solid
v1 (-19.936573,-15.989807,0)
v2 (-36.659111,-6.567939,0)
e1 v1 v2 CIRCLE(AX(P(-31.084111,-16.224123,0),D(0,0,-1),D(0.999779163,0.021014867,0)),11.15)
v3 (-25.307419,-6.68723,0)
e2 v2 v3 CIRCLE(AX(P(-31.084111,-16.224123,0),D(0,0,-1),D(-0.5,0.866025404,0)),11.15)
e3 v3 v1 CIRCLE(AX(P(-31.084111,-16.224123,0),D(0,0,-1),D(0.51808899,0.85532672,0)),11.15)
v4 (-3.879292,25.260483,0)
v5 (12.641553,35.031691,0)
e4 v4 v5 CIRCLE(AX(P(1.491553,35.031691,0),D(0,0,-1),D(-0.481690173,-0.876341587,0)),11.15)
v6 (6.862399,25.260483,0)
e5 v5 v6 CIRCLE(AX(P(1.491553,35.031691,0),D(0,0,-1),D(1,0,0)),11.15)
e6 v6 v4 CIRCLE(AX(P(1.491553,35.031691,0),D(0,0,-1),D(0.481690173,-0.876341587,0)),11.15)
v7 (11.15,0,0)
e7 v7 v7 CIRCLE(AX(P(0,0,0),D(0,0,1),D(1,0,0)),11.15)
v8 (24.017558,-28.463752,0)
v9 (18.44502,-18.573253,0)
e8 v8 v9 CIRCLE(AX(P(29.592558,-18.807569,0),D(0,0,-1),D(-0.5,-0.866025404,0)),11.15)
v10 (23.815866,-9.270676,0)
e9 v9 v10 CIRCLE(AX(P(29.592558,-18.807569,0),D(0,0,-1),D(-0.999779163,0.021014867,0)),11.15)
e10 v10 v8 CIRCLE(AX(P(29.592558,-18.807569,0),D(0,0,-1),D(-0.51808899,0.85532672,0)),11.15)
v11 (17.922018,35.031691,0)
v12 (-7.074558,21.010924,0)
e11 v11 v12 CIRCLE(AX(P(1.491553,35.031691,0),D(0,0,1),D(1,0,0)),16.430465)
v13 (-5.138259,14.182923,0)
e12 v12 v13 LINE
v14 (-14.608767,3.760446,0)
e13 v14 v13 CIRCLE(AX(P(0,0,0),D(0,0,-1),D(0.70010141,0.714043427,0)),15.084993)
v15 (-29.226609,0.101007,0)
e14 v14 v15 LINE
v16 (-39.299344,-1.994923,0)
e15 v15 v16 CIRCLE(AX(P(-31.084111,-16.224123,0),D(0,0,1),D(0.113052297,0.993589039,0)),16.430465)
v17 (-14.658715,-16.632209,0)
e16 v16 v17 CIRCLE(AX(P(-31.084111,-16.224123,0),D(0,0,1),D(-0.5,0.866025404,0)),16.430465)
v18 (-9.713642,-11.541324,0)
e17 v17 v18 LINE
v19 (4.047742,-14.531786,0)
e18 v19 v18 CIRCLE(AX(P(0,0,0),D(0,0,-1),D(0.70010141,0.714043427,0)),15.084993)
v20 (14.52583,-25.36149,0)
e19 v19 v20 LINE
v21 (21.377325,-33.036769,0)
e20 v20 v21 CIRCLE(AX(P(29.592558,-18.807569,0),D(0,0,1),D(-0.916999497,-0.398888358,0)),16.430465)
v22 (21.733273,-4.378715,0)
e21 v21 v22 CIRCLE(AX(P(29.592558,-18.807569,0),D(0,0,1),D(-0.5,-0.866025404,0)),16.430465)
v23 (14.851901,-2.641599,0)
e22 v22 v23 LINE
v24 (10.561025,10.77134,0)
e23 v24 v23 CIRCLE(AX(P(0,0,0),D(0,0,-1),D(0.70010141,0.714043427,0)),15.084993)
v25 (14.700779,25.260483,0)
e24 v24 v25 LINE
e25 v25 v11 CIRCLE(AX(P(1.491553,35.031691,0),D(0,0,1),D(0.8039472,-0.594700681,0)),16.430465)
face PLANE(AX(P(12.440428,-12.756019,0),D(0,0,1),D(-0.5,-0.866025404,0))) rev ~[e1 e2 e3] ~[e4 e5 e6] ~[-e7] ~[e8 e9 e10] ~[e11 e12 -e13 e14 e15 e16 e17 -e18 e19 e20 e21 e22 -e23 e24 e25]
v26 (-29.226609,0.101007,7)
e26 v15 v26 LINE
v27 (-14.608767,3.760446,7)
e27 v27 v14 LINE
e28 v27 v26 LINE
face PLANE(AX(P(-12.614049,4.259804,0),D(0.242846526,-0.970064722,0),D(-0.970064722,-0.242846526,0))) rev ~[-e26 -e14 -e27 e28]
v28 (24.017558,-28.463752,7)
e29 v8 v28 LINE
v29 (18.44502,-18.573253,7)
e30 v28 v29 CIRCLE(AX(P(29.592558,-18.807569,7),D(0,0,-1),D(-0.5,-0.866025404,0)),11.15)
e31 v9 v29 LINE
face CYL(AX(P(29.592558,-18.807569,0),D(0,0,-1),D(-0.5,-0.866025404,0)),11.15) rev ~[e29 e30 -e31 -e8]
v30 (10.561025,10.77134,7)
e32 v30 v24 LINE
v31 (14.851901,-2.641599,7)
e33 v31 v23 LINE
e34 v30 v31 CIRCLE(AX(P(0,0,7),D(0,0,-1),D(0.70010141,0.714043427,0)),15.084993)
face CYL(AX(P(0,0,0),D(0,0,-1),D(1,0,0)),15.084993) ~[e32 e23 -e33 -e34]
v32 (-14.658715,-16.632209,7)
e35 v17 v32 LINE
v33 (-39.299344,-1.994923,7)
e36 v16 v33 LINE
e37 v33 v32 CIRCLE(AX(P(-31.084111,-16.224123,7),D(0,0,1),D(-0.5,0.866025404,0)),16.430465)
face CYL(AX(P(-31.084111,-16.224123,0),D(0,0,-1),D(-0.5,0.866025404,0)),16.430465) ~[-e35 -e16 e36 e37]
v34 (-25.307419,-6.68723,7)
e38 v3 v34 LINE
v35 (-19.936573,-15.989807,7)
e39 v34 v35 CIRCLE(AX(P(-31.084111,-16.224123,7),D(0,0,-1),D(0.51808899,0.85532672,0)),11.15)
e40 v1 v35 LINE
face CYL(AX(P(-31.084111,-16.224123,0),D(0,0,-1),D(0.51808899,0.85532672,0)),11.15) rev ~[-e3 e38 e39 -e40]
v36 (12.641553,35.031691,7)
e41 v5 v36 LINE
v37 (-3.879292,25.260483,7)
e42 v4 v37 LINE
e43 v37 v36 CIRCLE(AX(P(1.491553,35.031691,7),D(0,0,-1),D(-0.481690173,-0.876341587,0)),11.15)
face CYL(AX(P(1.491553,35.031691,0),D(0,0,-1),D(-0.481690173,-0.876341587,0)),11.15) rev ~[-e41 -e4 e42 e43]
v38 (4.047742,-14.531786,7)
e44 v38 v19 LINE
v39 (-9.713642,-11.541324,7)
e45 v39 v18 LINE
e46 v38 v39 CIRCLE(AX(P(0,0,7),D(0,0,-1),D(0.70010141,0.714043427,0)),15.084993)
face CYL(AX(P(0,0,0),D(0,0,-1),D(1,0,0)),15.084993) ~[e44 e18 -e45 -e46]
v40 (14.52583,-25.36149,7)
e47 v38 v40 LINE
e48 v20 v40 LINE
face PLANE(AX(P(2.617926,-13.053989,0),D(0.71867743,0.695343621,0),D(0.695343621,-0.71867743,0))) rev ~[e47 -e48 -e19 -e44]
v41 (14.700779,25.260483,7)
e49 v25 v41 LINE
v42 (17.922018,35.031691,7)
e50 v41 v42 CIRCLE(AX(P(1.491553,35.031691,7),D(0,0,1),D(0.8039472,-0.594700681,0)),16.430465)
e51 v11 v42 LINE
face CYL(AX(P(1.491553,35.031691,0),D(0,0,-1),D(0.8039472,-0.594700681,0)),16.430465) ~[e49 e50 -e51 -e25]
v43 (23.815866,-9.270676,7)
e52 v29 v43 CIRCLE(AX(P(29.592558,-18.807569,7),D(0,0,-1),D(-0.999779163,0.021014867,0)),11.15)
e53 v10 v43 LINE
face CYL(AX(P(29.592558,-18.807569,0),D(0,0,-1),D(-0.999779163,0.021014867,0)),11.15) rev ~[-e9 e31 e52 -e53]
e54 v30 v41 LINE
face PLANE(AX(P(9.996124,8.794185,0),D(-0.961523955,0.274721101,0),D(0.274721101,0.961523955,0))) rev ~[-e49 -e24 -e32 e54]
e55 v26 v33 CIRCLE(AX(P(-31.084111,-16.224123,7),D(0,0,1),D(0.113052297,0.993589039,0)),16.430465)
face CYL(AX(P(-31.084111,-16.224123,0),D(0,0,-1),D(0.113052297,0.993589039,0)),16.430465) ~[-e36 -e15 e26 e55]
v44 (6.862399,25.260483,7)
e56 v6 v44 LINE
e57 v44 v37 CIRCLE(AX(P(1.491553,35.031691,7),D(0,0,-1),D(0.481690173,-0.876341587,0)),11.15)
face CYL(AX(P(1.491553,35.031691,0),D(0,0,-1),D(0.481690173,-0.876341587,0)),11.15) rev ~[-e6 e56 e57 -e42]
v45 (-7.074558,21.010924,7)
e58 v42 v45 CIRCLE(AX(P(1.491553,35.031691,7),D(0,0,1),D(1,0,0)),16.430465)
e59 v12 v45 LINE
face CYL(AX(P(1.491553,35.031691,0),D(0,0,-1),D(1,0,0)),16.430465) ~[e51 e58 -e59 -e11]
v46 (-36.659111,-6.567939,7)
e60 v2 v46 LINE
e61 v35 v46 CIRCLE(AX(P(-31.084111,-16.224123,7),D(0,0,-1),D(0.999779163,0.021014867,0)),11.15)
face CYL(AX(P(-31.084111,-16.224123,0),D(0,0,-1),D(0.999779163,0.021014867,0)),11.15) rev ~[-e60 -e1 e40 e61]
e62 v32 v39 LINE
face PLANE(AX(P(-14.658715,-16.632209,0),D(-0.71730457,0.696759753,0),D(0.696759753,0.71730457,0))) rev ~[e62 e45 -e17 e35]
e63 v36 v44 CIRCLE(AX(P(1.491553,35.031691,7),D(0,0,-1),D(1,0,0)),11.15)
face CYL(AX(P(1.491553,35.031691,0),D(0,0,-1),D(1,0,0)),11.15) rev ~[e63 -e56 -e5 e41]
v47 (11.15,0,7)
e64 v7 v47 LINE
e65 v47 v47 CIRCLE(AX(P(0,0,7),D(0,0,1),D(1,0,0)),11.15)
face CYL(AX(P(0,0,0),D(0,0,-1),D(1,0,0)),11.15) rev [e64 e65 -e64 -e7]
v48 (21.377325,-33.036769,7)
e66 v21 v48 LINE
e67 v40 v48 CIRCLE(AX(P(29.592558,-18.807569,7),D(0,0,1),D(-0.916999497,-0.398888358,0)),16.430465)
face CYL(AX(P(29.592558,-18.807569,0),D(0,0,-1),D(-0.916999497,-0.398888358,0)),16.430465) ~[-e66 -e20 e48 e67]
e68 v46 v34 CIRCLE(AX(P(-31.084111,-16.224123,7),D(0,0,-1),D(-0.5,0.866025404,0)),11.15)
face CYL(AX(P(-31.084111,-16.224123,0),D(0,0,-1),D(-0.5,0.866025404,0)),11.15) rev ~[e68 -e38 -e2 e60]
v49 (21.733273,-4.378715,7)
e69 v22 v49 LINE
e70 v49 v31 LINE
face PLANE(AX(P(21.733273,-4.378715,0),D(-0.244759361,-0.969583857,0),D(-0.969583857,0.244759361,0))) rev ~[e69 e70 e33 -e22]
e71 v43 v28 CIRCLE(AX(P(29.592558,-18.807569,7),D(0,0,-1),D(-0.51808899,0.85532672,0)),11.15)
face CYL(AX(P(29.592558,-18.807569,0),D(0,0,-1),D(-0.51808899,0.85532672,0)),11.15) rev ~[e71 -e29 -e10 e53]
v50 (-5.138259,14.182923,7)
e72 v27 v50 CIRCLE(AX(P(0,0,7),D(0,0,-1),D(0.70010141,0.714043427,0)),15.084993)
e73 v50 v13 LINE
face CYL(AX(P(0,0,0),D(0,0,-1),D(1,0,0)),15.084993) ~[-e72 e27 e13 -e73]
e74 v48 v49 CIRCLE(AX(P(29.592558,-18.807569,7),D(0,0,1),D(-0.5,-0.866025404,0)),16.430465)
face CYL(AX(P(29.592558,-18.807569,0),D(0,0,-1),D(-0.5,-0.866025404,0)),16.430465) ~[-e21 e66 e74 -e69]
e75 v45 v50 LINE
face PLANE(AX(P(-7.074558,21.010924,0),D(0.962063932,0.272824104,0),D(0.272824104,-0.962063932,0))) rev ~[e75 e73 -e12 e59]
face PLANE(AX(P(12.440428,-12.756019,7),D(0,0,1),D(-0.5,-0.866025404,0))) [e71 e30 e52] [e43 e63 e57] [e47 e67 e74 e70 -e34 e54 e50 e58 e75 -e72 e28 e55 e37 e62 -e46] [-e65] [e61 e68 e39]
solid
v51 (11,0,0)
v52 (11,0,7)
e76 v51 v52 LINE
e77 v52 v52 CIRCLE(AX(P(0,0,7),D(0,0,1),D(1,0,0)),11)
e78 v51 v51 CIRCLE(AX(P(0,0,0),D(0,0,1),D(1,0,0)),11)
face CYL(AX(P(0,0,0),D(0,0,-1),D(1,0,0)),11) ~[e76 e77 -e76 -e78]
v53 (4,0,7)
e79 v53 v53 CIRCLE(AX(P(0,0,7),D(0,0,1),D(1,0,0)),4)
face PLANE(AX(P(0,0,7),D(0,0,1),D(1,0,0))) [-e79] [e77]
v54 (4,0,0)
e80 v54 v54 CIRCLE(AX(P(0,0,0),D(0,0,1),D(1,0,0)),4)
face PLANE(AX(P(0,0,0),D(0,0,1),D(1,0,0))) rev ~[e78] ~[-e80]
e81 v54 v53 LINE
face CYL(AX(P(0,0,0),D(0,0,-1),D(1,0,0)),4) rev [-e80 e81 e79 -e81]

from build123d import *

# Parameters (mm, degrees)
F0_R            = 11
F0_R_2          = 4
F1_DEPTH        = 7
F2_R            = 15.0849931144
F2_R_2          = 11.15
F3_DEPTH        = 7
F5_DEPTH        = 7
F5_COPIES_COUNT = 3


# Not quite as in the source:
# - a pattern or mirror of a feature is missing from the dataset's text; its kind, count and spacing are read off the source's solid


with BuildPart() as f1:
    # F0 (on Top) → F1 (new body)
    with BuildSketch(Plane.XY):
        Circle(F0_R)
        Circle(F0_R_2, mode=Mode.SUBTRACT)
    extrude(amount=F1_DEPTH)


with BuildPart() as f3:
    # F2 (on Top) → F3 (new body)
    with BuildSketch(Plane.XY):
        Circle(F2_R)
        Circle(F2_R_2, mode=Mode.SUBTRACT)
    extrude(amount=F3_DEPTH)

    # F4 (on Top) → F5 (join)
    with BuildSketch(Plane.XY):
        with BuildLine():
            Line((-7.0745577316, 21.0109236638), (-4.8416383778, 13.1369449955))
            Line((-4.8416383778, 13.1369449955), (6.196208957, 12.7750489976))
            Line((6.196208957, 12.7750489976), (9.9961235482, 8.7941850849))
            Line((9.9961235482, 8.7941850849), (14.7007794568, 25.2604825284))
            ThreePointArc((14.7007794568, 25.2604825284), (4.6386657732, 18.9054436461), (-7.0745577316, 21.0109236638))
        make_face()
        with BuildLine():
            ThreePointArc((17.9220181184, 35.0316912253), (-6.5463257275, 49.361823179), (-7.0745577316, 21.0109236638))
            Line((-7.0745577316, 21.0109236638), (-8.2796565302, 25.2604825284))
            Line((-8.2796565302, 25.2604825284), (-3.8792922685, 25.2604825284))
            ThreePointArc((-3.8792922685, 25.2604825284), (-4.184606348, 44.6287591763), (12.6415531586, 35.0316912253))
            ThreePointArc((12.6415531586, 35.0316912253), (11.0886211095, 29.3555317188), (6.8623985856, 25.2604825284))
            Line((6.8623985856, 25.2604825284), (14.7007794568, 25.2604825284))
            ThreePointArc((14.7007794568, 25.2604825284), (17.0959421027, 29.8874493494), (17.9220181184, 35.0316912253))
        make_face()
        with BuildLine():
            Line((-8.2796565302, 25.2604825284), (-7.0745577316, 21.0109236638))
            ThreePointArc((-7.0745577316, 21.0109236638), (4.6386657732, 18.9054436461), (14.7007794568, 25.2604825284))
            Line((14.7007794568, 25.2604825284), (6.8623985856, 25.2604825284))
            ThreePointArc((6.8623985856, 25.2604825284), (1.4915531586, 23.8816912253), (-3.8792922685, 25.2604825284))
            Line((-3.8792922685, 25.2604825284), (-8.2796565302, 25.2604825284))
        make_face()
    f5 = extrude(amount=F5_DEPTH)

    # F5_copies: F5 ×3 about axis
    f5_copies_axis = Axis((0, 0, 0), (0, 0, 1))
    for i in range(1, F5_COPIES_COUNT):
        add(f5.rotate(f5_copies_axis, i * 360 / F5_COPIES_COUNT))


solid = Compound([f1.part, f3.part])
